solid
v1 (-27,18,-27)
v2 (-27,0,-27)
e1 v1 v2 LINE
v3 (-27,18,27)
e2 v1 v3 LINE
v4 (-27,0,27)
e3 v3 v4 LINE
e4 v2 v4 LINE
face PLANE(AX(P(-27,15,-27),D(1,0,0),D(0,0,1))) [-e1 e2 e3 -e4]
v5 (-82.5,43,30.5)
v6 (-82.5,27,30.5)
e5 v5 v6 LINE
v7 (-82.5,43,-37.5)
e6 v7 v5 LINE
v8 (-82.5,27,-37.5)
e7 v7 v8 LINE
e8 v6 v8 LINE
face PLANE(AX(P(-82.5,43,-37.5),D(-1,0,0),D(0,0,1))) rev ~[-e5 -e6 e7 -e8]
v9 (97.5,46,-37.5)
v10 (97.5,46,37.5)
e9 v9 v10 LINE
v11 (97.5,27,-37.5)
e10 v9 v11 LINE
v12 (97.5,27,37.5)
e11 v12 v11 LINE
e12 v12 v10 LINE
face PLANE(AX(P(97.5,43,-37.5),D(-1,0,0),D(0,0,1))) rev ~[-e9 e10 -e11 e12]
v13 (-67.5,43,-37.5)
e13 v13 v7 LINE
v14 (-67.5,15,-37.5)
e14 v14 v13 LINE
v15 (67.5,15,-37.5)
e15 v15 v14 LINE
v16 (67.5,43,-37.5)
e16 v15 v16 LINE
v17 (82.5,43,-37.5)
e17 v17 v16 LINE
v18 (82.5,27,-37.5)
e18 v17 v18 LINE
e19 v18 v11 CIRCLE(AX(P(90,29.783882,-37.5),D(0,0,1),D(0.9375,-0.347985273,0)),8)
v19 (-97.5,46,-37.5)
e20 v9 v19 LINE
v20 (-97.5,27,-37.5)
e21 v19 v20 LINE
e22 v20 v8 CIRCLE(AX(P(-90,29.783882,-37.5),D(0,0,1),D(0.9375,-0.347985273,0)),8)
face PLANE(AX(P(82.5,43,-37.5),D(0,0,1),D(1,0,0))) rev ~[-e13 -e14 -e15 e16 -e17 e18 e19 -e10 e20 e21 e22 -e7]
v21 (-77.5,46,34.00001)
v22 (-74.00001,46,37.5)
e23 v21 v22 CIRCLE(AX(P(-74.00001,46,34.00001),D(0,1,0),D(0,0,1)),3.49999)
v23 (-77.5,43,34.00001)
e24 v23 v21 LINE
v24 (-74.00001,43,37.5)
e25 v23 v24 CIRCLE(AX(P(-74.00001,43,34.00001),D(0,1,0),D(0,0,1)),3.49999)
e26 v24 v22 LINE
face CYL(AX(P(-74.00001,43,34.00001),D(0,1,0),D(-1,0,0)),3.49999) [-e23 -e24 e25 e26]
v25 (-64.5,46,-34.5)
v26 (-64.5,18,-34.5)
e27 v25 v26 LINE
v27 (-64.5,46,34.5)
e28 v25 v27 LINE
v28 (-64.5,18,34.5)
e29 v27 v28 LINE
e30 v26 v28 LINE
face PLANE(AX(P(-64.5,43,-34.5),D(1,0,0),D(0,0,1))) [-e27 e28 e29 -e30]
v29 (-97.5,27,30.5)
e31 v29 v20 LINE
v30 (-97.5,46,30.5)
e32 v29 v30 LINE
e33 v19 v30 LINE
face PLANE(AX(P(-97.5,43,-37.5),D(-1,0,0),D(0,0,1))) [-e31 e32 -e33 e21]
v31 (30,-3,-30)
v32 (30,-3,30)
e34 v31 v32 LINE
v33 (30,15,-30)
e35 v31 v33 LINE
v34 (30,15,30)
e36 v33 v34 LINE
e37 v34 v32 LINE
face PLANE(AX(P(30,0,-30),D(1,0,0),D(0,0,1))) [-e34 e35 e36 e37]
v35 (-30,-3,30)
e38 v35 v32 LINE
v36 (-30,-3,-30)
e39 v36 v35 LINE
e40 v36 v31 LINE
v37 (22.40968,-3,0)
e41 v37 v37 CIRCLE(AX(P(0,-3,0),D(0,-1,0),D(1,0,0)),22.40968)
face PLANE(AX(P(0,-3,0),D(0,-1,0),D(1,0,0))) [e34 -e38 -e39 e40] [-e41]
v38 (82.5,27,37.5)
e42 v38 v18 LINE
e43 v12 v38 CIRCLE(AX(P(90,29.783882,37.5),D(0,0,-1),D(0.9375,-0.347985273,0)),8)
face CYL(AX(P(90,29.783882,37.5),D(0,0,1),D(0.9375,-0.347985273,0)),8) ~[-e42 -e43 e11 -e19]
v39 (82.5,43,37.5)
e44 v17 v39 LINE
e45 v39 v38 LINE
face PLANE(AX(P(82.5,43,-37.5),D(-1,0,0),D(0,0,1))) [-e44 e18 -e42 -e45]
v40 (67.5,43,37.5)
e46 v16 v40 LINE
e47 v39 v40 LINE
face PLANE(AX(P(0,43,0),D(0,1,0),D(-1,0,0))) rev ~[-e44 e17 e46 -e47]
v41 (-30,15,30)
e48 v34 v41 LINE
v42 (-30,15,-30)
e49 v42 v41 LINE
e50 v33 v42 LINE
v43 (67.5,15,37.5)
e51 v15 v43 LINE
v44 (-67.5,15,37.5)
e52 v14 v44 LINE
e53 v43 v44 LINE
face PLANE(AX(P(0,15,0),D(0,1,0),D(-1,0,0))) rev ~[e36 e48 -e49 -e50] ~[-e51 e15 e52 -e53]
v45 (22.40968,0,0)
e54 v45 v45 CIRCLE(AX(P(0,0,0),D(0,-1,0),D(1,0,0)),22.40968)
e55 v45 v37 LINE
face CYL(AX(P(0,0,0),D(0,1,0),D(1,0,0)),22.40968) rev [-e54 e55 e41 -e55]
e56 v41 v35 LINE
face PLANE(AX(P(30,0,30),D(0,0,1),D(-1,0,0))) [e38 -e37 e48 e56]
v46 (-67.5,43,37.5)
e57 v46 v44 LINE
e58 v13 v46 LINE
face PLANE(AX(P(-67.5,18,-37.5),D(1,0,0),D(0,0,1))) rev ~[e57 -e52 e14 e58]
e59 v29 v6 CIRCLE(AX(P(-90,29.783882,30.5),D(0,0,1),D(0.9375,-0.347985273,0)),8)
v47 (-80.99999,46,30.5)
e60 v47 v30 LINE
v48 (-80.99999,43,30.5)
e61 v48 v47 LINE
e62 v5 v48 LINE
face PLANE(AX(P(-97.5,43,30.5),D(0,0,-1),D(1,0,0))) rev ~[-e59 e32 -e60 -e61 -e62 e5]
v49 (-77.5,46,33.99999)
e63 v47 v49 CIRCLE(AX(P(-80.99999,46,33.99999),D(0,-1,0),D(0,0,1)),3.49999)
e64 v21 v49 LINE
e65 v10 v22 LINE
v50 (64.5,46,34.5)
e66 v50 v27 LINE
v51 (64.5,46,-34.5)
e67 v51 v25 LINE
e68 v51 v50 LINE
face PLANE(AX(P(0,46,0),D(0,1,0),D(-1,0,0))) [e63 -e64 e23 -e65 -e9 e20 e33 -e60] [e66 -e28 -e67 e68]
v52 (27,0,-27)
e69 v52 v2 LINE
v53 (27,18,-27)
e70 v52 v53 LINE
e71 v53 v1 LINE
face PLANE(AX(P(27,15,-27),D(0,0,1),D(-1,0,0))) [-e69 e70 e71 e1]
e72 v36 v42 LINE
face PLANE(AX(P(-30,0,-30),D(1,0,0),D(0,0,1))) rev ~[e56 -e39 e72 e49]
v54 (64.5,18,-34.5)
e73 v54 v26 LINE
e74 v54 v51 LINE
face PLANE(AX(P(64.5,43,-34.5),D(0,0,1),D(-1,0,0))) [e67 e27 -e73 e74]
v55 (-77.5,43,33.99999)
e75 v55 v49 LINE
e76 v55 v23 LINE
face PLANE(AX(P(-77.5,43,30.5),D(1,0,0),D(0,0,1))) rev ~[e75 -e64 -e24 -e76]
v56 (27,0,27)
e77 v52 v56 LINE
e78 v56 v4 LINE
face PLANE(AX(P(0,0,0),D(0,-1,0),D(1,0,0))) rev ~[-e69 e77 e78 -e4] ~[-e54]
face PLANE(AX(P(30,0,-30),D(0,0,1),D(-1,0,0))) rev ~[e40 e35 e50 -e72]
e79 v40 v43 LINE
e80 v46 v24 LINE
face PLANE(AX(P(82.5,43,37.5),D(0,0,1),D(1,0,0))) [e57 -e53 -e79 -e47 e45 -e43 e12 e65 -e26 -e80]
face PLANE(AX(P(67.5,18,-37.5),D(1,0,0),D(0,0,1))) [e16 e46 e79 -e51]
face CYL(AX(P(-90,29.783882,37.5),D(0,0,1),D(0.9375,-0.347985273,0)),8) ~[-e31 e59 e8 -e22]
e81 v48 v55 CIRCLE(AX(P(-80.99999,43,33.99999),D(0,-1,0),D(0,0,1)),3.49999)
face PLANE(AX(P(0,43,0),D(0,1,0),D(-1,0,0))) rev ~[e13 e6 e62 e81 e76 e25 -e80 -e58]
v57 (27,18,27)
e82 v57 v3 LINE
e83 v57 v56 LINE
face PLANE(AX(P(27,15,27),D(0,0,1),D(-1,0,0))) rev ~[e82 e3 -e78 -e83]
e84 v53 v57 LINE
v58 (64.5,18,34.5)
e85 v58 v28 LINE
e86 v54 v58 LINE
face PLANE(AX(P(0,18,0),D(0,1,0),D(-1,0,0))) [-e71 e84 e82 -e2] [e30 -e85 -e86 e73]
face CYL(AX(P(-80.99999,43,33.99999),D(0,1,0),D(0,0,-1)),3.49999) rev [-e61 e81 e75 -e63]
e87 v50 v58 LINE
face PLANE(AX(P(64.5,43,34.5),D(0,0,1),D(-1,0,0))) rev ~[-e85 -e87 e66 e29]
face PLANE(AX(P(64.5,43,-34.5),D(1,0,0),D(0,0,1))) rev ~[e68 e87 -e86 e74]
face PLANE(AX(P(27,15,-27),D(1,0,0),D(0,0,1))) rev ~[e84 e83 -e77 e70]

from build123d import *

# Parameters (mm, degrees)
F0_W      = 60
F0_H      = 60
F0_R      = 22.4096796893
F1_DEPTH  = 3
F2_W      = 60
F2_H      = 60
F2_W_2    = 54
F2_H_2    = 54
F3_DEPTH  = 15
F4_W      = 135
F4_H      = 75
F4_W_2    = 54
F4_H_2    = 54
F5_DEPTH  = 3
F6_W      = 135
F6_H      = 75
F6_W_2    = 129
F6_H_2    = 69
F7_DEPTH  = 25
F8_W      = 195
F8_H      = 75
F8_W_2    = 129
F8_H_2    = 69
F9_DEPTH  = 3
F10_W     = 15
F10_H     = 68
F11_DEPTH = 25
F12_W     = 15
F12_H     = 75
F13_DEPTH = 25
F15_DEPTH = 200
F17_DEPTH = 25
F18_R     = 3.49999
F21_DEPTH = 60


# Not quite as in the source:
# - a fillet or chamfer is up to 0.001 mm smaller than in the source, because OpenCascade refuses the exact size


with BuildPart() as f1:
    # F0 (on Front) → F1 (new body)
    with BuildSketch(Plane.XZ):
        Rectangle(F0_W, F0_H)
        Circle(F0_R, mode=Mode.SUBTRACT)
    extrude(amount=F1_DEPTH)

    # F2 (on face) → F3 (join)
    with BuildSketch(Plane(origin=(0, 0, 0), x_dir=(-1, 0, 0), z_dir=(0, 1, 0))):
        Rectangle(F2_W, F2_H)
        Rectangle(F2_W_2, F2_H_2, mode=Mode.SUBTRACT)
    extrude(amount=F3_DEPTH)

    # F4 (on face) → F5 (join)
    with BuildSketch(Plane(origin=(0, 15, 0), x_dir=(-1, 0, 0), z_dir=(0, 1, 0))):
        Rectangle(F4_W, F4_H)
        Rectangle(F4_W_2, F4_H_2, mode=Mode.SUBTRACT)
    extrude(amount=F5_DEPTH)

    # F6 (on face) → F7 (join)
    with BuildSketch(Plane(origin=(0, 18, 0), x_dir=(-1, 0, 0), z_dir=(0, 1, 0))):
        Rectangle(F6_W, F6_H)
        Rectangle(F6_W_2, F6_H_2, mode=Mode.SUBTRACT)
    extrude(amount=F7_DEPTH)

    # F8 (on face) → F9 (join)
    with BuildSketch(Plane(origin=(0, 43, 0), x_dir=(-1, 0, 0), z_dir=(0, 1, 0))):
        Rectangle(F8_W, F8_H)
        Rectangle(F8_W_2, F8_H_2, mode=Mode.SUBTRACT)
    extrude(amount=F9_DEPTH)

    # F10 (on face) → F11 (join)
    with BuildSketch(Plane.XZ.offset(-43)):
        with Locations((-90, -3.5)):
            Rectangle(F10_W, F10_H)
    extrude(amount=F11_DEPTH)

    # F12 (on face) → F13 (join)
    with BuildSketch(Plane.XZ.offset(-43)):
        with Locations((90, 0)):
            Rectangle(F12_W, F12_H)
    extrude(amount=F13_DEPTH)

    # F14 (on face) → F15 (cut)
    with BuildSketch(Plane.XY.offset(37.5)):
        with BuildLine():
            ThreePointArc((-82.5, 27), (-90, 21.7838821814), (-97.5, 27))
            Line((-97.5, 27), (-97.5, 18))
            Line((-97.5, 18), (-82.5, 18))
            Line((-82.5, 18), (-82.5, 27))
        make_face()
        with BuildLine():
            ThreePointArc((97.5, 27), (90, 21.7838821814), (82.5, 27))
            Line((82.5, 27), (82.5, 18))
            Line((82.5, 18), (97.5, 18))
            Line((97.5, 18), (97.5, 27))
        make_face()
    extrude(amount=-F15_DEPTH, mode=Mode.SUBTRACT)

    # F16 (on face) → F17 (cut)
    with BuildSketch(Plane.XZ.offset(-43)):
        Polygon((-77.5, 37.5), (-82.5, 37.5), (-97.5, 37.5), (-97.5, 30.5), (-82.5, 30.5), (-77.5, 30.5), align=None)
    extrude(amount=-F17_DEPTH, mode=Mode.SUBTRACT)

    # F18 (radius 3.5 in the source; OpenCascade refuses exactly that, so slightly less here)
    f18_edges = [f1.edges().sort_by_distance(p)[0] for p in [
        (-77.5, 44.5, 30.5),
        (-77.5, 44.5, 37.5),
    ]]
    fillet(f18_edges, radius=F18_R)

    # F20 (on face) → F21 (cut)
    with BuildSketch(Plane.XY.offset(30)):
        Polygon((-30, -3), (-50, 15), (-50, -3), align=None)
    extrude(amount=-F21_DEPTH, mode=Mode.SUBTRACT)


solid = f1.part
